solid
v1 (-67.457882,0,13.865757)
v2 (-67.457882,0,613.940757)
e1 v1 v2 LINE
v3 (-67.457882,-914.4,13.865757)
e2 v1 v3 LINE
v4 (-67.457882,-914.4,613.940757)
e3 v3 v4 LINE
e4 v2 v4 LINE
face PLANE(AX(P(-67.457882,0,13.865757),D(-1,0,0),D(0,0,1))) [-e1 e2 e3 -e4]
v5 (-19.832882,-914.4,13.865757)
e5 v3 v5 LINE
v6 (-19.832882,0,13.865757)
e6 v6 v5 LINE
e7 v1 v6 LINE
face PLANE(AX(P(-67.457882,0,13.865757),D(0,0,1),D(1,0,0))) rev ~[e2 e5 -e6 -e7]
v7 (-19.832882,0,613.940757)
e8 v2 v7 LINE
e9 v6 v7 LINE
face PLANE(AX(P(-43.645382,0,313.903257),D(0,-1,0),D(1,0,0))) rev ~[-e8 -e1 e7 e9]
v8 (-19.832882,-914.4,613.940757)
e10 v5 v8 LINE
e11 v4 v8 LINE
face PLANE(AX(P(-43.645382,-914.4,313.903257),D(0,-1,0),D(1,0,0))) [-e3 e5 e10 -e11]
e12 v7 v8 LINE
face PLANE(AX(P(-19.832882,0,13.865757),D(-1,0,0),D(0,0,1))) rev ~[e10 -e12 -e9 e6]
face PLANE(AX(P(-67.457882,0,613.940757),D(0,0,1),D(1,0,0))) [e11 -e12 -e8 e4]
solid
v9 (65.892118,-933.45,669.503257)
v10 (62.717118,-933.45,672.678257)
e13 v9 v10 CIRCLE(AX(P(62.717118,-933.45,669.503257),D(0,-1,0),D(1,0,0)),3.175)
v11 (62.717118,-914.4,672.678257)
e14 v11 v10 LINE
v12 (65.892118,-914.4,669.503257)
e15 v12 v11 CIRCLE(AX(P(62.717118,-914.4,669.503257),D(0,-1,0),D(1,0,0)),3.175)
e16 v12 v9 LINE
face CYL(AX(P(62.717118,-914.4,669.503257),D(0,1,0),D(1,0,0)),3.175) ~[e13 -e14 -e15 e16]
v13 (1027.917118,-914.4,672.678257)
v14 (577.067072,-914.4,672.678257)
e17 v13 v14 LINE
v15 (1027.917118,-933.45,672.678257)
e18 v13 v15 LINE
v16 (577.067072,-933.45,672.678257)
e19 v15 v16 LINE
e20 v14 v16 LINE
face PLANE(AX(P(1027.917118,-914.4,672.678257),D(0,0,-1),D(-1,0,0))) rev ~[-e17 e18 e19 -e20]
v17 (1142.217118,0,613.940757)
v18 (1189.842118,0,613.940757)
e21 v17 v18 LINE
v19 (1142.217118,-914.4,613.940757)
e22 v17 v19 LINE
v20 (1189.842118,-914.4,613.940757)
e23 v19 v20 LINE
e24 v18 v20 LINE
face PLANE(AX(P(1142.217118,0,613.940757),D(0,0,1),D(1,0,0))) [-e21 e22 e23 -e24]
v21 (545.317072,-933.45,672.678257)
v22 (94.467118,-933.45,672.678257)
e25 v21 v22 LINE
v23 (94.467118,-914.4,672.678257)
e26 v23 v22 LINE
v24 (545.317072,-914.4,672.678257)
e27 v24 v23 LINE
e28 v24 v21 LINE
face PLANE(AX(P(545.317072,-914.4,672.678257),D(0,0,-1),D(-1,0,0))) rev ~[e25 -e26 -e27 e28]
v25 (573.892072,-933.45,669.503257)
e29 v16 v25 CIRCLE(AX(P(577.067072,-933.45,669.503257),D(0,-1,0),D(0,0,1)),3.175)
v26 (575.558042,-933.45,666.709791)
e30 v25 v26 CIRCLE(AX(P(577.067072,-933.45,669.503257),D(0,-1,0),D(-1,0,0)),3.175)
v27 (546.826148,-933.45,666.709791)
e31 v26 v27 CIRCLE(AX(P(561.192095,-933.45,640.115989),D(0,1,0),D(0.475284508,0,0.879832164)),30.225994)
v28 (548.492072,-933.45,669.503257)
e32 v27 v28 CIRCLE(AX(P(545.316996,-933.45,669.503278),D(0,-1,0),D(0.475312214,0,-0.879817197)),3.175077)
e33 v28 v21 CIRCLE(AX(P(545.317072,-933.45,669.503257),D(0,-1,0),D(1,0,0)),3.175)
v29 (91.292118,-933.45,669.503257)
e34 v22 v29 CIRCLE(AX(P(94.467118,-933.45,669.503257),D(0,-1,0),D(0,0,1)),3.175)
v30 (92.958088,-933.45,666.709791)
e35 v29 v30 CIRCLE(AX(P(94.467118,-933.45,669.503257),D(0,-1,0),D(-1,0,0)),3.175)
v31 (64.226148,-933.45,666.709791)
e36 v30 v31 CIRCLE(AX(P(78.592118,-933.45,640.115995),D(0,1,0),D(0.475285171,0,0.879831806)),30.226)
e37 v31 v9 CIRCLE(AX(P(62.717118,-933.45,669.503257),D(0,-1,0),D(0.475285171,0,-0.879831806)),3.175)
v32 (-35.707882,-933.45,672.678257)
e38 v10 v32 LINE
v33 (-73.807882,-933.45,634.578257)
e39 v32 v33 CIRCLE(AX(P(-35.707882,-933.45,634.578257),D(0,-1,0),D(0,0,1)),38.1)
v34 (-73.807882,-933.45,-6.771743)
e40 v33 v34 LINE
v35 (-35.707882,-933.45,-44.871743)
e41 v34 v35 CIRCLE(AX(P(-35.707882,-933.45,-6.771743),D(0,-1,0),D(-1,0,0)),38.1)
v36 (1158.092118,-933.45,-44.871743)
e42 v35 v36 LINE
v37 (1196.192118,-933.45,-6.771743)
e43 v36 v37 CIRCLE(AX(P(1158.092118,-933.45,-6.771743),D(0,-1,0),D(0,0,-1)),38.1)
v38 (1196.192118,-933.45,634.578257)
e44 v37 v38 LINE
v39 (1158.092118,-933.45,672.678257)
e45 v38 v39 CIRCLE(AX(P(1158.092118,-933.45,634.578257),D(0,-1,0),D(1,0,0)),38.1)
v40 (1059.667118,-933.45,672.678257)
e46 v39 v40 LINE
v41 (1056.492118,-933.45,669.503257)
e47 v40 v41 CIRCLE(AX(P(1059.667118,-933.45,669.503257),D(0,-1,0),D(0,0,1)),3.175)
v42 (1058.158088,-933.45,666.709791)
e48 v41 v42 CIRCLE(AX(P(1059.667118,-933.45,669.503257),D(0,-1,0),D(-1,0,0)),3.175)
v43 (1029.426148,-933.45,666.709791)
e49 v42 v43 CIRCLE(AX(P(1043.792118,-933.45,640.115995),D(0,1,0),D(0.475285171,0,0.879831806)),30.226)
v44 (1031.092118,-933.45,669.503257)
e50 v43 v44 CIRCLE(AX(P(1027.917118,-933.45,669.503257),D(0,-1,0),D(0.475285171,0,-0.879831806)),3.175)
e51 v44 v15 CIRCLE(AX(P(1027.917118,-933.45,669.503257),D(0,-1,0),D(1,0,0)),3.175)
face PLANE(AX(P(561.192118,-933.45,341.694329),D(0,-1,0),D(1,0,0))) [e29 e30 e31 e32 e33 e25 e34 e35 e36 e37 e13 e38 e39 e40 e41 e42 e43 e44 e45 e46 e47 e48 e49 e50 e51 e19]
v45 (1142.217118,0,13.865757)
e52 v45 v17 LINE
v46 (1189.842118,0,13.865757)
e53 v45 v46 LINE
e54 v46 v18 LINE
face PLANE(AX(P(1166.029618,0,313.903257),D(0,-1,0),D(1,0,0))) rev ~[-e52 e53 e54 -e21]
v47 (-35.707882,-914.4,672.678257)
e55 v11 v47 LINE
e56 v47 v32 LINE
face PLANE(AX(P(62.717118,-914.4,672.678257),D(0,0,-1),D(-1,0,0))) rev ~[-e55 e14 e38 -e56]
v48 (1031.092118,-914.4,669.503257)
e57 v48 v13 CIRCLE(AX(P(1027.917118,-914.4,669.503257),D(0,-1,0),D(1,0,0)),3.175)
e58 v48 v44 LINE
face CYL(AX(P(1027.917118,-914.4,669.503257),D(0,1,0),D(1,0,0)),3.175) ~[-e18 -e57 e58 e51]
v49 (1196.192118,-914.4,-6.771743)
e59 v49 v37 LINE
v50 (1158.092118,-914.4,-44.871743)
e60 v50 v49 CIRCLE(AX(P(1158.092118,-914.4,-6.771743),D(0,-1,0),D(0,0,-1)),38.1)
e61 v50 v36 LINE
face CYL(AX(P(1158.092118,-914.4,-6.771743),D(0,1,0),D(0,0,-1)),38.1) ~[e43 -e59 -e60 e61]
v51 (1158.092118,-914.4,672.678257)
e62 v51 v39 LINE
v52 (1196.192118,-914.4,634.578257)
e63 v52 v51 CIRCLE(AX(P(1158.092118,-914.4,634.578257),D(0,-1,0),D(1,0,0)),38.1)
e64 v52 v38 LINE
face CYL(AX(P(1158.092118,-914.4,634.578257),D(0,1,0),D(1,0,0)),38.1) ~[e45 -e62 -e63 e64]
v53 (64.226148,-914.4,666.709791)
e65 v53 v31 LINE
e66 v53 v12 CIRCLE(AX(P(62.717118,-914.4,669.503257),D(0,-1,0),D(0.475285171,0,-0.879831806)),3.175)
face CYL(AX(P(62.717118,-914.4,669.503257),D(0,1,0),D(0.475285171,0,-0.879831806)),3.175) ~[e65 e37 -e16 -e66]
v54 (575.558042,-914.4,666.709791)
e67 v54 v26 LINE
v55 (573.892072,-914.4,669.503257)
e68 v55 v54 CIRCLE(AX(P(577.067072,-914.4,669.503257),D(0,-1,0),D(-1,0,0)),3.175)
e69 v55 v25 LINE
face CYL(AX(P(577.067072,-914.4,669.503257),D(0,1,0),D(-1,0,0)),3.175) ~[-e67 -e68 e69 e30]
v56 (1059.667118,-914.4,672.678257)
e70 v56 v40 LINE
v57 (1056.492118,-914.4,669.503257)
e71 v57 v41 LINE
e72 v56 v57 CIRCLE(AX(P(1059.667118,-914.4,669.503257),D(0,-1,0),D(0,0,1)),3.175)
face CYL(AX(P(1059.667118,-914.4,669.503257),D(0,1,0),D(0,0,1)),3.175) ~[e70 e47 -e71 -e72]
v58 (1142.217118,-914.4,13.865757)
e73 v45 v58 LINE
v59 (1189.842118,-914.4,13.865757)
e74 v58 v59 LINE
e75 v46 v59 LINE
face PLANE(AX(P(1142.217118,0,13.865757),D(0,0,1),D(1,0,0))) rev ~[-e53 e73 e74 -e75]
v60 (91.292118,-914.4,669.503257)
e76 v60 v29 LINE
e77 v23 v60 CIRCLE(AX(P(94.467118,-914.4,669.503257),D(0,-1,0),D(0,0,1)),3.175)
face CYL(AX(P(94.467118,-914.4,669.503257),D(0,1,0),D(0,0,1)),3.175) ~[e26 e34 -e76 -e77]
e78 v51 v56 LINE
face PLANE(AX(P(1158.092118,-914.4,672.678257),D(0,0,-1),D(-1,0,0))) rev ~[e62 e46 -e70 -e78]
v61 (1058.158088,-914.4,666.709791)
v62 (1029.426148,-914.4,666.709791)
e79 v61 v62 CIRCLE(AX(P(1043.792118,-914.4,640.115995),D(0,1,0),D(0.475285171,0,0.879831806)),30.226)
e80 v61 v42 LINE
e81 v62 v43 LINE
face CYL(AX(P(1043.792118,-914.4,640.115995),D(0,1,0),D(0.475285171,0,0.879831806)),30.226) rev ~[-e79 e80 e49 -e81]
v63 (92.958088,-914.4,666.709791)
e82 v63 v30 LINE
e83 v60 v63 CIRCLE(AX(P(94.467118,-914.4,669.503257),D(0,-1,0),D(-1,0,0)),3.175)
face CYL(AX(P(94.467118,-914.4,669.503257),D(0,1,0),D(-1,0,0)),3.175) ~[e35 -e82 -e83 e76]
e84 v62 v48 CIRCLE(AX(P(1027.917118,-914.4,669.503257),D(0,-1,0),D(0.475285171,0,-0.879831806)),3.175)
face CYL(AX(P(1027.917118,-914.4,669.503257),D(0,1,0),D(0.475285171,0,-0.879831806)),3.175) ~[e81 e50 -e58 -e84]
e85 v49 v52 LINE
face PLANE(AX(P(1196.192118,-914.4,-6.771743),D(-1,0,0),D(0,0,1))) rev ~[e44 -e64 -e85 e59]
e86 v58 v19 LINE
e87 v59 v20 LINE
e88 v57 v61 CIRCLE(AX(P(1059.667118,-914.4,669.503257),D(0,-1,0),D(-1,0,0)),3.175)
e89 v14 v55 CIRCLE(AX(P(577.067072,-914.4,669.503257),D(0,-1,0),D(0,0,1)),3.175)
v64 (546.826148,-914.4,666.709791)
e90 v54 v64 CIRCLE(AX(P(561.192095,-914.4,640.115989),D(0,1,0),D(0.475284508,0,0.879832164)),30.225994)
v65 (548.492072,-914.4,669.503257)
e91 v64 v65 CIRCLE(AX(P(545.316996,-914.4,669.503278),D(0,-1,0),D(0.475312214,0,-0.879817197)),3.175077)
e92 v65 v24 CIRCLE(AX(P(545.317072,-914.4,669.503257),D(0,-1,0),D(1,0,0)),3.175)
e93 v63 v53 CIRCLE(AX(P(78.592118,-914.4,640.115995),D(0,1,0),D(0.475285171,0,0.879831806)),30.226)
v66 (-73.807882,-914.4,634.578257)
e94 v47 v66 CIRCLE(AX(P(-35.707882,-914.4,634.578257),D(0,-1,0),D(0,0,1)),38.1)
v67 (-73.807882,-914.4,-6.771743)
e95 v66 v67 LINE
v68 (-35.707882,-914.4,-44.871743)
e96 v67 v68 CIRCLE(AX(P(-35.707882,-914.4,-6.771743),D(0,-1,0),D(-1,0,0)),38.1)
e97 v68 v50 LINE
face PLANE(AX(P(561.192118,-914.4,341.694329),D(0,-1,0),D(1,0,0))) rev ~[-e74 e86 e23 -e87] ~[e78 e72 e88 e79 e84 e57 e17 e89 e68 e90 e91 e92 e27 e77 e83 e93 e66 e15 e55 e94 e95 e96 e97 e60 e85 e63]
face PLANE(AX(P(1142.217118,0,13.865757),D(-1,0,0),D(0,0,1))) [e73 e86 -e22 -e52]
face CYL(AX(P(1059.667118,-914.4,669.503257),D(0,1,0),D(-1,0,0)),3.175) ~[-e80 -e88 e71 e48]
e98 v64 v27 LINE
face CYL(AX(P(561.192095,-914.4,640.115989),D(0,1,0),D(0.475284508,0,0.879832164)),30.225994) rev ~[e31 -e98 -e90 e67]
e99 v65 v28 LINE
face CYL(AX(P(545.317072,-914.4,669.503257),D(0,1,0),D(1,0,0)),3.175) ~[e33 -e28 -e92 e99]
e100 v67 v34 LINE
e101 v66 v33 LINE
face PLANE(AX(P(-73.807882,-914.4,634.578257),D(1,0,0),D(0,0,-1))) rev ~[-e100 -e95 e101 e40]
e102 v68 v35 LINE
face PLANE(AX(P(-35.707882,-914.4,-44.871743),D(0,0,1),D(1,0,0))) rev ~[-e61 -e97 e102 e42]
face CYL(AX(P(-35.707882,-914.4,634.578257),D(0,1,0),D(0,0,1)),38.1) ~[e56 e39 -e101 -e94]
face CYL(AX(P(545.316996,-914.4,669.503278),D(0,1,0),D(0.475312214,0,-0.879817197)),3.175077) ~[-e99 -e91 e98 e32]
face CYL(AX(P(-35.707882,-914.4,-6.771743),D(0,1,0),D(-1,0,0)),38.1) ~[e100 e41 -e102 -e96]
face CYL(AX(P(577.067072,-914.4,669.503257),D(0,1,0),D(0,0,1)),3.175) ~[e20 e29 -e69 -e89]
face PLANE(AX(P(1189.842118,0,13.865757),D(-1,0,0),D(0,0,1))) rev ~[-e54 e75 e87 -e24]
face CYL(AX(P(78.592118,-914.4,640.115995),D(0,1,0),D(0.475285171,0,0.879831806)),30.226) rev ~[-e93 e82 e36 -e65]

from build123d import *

# Parameters (mm, degrees)
F0_W     = 47.625
F0_H     = 600.075
F1_DEPTH = 914.4
F2_W     = 47.625
F2_H     = 600.075
F3_DEPTH = 19.05


# Not quite as in the source:
# - ends of sketch curves that miss each other by under 0.0002 mm in the source are joined


with BuildPart() as f1:
    # F0 (on Front) → F1 (new body)
    with BuildSketch(Plane.XZ):
        with Locations((-43.6453819275, 313.9032570556)):
            Rectangle(F0_W, F0_H)
    extrude(amount=F1_DEPTH)


with BuildPart() as f1b:
    # F0 (on Front) → F1, piece 2 (new body)
    with BuildSketch(Plane.XZ):
        with Locations((1166.0296180725, 313.9032570556)):
            Rectangle(F0_W, F0_H)
    extrude(amount=F1_DEPTH)

    # F2 (on face) → F3 (join)
    with BuildSketch(Plane.XZ.offset(914.4)):
        with BuildLine():
            Line((62.7171180725, 672.6782570556), (-35.7078819275, 672.6782570556))
            ThreePointArc((-35.7078819275, 672.6782570556), (-62.6486502907, 661.5190254188), (-73.8078819275, 634.5782570556))
            Line((-73.8078819275, 634.5782570556), (-73.8078819275, -6.7717429444))
            ThreePointArc((-73.8078819275, -6.7717429444), (-62.6486502907, -33.7125113076), (-35.7078819275, -44.8717429444))
            Line((-35.7078819275, -44.8717429444), (1158.0921180725, -44.8717429444))
            ThreePointArc((1158.0921180725, -44.8717429444), (1185.0328864357, -33.7125113076), (1196.1921180725, -6.7717429444))
            Line((1196.1921180725, -6.7717429444), (1196.1921180725, 634.5782570556))
            ThreePointArc((1196.1921180725, 634.5782570556), (1185.0328864357, 661.5190254188), (1158.0921180725, 672.6782570556))
            Line((1158.0921180725, 672.6782570556), (1059.6671180725, 672.6782570556))
            ThreePointArc((1059.6671180725, 672.6782570556), (1057.4220540422, 671.7483210859), (1056.4921180725, 669.5032570556))
            ThreePointArc((1056.4921180725, 669.5032570556), (1056.9402337169, 667.8769954804), (1058.1580876543, 666.7097910729))
            ThreePointArc((1058.1580876543, 666.7097910729), (1043.7921180725, 609.8899949171), (1029.4261484908, 666.7097910729))
            ThreePointArc((1029.4261484908, 666.7097910729), (1030.6440024281, 667.8769954804), (1031.0921180725, 669.5032570556))
            ThreePointArc((1031.0921180725, 669.5032570556), (1030.1621821028, 671.7483210859), (1027.9171180725, 672.6782570556))
            Line((1027.9171180725, 672.6782570556), (577.0670724869, 672.6782570556))
            ThreePointArc((577.0670724869, 672.6782570556), (574.8220084566, 671.7483210859), (573.8920724869, 669.5032570556))
            ThreePointArc((573.8920724869, 669.5032570556), (574.3401881312, 667.8769954804), (575.5580420686, 666.7097910729))
            ThreePointArc((575.5580420686, 666.7097910729), (561.1921180725, 609.8899949171), (546.8261484908, 666.7097910729))
            ThreePointArc((546.8261484908, 666.7097910729), (548.0439568425, 667.8769954804), (548.4920724869, 669.5032570556))
            ThreePointArc((548.4920724869, 669.5032570556), (547.5621365171, 671.7483210859), (545.3170724869, 672.6782570556))
            Line((545.3170724869, 672.6782570556), (94.4671180725, 672.6782570556))
            ThreePointArc((94.4671180725, 672.6782570556), (92.2220540422, 671.7483210859), (91.2921180725, 669.5032570556))
            ThreePointArc((91.2921180725, 669.5032570556), (91.7402337169, 667.8769954804), (92.9580876543, 666.7097910729))
            ThreePointArc((92.9580876543, 666.7097910729), (78.5921180725, 609.8899949171), (64.2261484908, 666.7097910729))
            ThreePointArc((64.2261484908, 666.7097910729), (65.4440024281, 667.8769954804), (65.8921180725, 669.5032570556))
            ThreePointArc((65.8921180725, 669.5032570556), (64.9621821028, 671.7483210859), (62.7171180725, 672.6782570556))
        make_face()
        with Locations((-43.6453819275, 313.9032570556)):
            Rectangle(F2_W, F2_H, mode=Mode.SUBTRACT)
        with Locations((-43.6453819275, 313.9032570556)):
            Rectangle(F2_W, F2_H)
    extrude(amount=F3_DEPTH)


solid = Compound([f1.part, f1b.part])
